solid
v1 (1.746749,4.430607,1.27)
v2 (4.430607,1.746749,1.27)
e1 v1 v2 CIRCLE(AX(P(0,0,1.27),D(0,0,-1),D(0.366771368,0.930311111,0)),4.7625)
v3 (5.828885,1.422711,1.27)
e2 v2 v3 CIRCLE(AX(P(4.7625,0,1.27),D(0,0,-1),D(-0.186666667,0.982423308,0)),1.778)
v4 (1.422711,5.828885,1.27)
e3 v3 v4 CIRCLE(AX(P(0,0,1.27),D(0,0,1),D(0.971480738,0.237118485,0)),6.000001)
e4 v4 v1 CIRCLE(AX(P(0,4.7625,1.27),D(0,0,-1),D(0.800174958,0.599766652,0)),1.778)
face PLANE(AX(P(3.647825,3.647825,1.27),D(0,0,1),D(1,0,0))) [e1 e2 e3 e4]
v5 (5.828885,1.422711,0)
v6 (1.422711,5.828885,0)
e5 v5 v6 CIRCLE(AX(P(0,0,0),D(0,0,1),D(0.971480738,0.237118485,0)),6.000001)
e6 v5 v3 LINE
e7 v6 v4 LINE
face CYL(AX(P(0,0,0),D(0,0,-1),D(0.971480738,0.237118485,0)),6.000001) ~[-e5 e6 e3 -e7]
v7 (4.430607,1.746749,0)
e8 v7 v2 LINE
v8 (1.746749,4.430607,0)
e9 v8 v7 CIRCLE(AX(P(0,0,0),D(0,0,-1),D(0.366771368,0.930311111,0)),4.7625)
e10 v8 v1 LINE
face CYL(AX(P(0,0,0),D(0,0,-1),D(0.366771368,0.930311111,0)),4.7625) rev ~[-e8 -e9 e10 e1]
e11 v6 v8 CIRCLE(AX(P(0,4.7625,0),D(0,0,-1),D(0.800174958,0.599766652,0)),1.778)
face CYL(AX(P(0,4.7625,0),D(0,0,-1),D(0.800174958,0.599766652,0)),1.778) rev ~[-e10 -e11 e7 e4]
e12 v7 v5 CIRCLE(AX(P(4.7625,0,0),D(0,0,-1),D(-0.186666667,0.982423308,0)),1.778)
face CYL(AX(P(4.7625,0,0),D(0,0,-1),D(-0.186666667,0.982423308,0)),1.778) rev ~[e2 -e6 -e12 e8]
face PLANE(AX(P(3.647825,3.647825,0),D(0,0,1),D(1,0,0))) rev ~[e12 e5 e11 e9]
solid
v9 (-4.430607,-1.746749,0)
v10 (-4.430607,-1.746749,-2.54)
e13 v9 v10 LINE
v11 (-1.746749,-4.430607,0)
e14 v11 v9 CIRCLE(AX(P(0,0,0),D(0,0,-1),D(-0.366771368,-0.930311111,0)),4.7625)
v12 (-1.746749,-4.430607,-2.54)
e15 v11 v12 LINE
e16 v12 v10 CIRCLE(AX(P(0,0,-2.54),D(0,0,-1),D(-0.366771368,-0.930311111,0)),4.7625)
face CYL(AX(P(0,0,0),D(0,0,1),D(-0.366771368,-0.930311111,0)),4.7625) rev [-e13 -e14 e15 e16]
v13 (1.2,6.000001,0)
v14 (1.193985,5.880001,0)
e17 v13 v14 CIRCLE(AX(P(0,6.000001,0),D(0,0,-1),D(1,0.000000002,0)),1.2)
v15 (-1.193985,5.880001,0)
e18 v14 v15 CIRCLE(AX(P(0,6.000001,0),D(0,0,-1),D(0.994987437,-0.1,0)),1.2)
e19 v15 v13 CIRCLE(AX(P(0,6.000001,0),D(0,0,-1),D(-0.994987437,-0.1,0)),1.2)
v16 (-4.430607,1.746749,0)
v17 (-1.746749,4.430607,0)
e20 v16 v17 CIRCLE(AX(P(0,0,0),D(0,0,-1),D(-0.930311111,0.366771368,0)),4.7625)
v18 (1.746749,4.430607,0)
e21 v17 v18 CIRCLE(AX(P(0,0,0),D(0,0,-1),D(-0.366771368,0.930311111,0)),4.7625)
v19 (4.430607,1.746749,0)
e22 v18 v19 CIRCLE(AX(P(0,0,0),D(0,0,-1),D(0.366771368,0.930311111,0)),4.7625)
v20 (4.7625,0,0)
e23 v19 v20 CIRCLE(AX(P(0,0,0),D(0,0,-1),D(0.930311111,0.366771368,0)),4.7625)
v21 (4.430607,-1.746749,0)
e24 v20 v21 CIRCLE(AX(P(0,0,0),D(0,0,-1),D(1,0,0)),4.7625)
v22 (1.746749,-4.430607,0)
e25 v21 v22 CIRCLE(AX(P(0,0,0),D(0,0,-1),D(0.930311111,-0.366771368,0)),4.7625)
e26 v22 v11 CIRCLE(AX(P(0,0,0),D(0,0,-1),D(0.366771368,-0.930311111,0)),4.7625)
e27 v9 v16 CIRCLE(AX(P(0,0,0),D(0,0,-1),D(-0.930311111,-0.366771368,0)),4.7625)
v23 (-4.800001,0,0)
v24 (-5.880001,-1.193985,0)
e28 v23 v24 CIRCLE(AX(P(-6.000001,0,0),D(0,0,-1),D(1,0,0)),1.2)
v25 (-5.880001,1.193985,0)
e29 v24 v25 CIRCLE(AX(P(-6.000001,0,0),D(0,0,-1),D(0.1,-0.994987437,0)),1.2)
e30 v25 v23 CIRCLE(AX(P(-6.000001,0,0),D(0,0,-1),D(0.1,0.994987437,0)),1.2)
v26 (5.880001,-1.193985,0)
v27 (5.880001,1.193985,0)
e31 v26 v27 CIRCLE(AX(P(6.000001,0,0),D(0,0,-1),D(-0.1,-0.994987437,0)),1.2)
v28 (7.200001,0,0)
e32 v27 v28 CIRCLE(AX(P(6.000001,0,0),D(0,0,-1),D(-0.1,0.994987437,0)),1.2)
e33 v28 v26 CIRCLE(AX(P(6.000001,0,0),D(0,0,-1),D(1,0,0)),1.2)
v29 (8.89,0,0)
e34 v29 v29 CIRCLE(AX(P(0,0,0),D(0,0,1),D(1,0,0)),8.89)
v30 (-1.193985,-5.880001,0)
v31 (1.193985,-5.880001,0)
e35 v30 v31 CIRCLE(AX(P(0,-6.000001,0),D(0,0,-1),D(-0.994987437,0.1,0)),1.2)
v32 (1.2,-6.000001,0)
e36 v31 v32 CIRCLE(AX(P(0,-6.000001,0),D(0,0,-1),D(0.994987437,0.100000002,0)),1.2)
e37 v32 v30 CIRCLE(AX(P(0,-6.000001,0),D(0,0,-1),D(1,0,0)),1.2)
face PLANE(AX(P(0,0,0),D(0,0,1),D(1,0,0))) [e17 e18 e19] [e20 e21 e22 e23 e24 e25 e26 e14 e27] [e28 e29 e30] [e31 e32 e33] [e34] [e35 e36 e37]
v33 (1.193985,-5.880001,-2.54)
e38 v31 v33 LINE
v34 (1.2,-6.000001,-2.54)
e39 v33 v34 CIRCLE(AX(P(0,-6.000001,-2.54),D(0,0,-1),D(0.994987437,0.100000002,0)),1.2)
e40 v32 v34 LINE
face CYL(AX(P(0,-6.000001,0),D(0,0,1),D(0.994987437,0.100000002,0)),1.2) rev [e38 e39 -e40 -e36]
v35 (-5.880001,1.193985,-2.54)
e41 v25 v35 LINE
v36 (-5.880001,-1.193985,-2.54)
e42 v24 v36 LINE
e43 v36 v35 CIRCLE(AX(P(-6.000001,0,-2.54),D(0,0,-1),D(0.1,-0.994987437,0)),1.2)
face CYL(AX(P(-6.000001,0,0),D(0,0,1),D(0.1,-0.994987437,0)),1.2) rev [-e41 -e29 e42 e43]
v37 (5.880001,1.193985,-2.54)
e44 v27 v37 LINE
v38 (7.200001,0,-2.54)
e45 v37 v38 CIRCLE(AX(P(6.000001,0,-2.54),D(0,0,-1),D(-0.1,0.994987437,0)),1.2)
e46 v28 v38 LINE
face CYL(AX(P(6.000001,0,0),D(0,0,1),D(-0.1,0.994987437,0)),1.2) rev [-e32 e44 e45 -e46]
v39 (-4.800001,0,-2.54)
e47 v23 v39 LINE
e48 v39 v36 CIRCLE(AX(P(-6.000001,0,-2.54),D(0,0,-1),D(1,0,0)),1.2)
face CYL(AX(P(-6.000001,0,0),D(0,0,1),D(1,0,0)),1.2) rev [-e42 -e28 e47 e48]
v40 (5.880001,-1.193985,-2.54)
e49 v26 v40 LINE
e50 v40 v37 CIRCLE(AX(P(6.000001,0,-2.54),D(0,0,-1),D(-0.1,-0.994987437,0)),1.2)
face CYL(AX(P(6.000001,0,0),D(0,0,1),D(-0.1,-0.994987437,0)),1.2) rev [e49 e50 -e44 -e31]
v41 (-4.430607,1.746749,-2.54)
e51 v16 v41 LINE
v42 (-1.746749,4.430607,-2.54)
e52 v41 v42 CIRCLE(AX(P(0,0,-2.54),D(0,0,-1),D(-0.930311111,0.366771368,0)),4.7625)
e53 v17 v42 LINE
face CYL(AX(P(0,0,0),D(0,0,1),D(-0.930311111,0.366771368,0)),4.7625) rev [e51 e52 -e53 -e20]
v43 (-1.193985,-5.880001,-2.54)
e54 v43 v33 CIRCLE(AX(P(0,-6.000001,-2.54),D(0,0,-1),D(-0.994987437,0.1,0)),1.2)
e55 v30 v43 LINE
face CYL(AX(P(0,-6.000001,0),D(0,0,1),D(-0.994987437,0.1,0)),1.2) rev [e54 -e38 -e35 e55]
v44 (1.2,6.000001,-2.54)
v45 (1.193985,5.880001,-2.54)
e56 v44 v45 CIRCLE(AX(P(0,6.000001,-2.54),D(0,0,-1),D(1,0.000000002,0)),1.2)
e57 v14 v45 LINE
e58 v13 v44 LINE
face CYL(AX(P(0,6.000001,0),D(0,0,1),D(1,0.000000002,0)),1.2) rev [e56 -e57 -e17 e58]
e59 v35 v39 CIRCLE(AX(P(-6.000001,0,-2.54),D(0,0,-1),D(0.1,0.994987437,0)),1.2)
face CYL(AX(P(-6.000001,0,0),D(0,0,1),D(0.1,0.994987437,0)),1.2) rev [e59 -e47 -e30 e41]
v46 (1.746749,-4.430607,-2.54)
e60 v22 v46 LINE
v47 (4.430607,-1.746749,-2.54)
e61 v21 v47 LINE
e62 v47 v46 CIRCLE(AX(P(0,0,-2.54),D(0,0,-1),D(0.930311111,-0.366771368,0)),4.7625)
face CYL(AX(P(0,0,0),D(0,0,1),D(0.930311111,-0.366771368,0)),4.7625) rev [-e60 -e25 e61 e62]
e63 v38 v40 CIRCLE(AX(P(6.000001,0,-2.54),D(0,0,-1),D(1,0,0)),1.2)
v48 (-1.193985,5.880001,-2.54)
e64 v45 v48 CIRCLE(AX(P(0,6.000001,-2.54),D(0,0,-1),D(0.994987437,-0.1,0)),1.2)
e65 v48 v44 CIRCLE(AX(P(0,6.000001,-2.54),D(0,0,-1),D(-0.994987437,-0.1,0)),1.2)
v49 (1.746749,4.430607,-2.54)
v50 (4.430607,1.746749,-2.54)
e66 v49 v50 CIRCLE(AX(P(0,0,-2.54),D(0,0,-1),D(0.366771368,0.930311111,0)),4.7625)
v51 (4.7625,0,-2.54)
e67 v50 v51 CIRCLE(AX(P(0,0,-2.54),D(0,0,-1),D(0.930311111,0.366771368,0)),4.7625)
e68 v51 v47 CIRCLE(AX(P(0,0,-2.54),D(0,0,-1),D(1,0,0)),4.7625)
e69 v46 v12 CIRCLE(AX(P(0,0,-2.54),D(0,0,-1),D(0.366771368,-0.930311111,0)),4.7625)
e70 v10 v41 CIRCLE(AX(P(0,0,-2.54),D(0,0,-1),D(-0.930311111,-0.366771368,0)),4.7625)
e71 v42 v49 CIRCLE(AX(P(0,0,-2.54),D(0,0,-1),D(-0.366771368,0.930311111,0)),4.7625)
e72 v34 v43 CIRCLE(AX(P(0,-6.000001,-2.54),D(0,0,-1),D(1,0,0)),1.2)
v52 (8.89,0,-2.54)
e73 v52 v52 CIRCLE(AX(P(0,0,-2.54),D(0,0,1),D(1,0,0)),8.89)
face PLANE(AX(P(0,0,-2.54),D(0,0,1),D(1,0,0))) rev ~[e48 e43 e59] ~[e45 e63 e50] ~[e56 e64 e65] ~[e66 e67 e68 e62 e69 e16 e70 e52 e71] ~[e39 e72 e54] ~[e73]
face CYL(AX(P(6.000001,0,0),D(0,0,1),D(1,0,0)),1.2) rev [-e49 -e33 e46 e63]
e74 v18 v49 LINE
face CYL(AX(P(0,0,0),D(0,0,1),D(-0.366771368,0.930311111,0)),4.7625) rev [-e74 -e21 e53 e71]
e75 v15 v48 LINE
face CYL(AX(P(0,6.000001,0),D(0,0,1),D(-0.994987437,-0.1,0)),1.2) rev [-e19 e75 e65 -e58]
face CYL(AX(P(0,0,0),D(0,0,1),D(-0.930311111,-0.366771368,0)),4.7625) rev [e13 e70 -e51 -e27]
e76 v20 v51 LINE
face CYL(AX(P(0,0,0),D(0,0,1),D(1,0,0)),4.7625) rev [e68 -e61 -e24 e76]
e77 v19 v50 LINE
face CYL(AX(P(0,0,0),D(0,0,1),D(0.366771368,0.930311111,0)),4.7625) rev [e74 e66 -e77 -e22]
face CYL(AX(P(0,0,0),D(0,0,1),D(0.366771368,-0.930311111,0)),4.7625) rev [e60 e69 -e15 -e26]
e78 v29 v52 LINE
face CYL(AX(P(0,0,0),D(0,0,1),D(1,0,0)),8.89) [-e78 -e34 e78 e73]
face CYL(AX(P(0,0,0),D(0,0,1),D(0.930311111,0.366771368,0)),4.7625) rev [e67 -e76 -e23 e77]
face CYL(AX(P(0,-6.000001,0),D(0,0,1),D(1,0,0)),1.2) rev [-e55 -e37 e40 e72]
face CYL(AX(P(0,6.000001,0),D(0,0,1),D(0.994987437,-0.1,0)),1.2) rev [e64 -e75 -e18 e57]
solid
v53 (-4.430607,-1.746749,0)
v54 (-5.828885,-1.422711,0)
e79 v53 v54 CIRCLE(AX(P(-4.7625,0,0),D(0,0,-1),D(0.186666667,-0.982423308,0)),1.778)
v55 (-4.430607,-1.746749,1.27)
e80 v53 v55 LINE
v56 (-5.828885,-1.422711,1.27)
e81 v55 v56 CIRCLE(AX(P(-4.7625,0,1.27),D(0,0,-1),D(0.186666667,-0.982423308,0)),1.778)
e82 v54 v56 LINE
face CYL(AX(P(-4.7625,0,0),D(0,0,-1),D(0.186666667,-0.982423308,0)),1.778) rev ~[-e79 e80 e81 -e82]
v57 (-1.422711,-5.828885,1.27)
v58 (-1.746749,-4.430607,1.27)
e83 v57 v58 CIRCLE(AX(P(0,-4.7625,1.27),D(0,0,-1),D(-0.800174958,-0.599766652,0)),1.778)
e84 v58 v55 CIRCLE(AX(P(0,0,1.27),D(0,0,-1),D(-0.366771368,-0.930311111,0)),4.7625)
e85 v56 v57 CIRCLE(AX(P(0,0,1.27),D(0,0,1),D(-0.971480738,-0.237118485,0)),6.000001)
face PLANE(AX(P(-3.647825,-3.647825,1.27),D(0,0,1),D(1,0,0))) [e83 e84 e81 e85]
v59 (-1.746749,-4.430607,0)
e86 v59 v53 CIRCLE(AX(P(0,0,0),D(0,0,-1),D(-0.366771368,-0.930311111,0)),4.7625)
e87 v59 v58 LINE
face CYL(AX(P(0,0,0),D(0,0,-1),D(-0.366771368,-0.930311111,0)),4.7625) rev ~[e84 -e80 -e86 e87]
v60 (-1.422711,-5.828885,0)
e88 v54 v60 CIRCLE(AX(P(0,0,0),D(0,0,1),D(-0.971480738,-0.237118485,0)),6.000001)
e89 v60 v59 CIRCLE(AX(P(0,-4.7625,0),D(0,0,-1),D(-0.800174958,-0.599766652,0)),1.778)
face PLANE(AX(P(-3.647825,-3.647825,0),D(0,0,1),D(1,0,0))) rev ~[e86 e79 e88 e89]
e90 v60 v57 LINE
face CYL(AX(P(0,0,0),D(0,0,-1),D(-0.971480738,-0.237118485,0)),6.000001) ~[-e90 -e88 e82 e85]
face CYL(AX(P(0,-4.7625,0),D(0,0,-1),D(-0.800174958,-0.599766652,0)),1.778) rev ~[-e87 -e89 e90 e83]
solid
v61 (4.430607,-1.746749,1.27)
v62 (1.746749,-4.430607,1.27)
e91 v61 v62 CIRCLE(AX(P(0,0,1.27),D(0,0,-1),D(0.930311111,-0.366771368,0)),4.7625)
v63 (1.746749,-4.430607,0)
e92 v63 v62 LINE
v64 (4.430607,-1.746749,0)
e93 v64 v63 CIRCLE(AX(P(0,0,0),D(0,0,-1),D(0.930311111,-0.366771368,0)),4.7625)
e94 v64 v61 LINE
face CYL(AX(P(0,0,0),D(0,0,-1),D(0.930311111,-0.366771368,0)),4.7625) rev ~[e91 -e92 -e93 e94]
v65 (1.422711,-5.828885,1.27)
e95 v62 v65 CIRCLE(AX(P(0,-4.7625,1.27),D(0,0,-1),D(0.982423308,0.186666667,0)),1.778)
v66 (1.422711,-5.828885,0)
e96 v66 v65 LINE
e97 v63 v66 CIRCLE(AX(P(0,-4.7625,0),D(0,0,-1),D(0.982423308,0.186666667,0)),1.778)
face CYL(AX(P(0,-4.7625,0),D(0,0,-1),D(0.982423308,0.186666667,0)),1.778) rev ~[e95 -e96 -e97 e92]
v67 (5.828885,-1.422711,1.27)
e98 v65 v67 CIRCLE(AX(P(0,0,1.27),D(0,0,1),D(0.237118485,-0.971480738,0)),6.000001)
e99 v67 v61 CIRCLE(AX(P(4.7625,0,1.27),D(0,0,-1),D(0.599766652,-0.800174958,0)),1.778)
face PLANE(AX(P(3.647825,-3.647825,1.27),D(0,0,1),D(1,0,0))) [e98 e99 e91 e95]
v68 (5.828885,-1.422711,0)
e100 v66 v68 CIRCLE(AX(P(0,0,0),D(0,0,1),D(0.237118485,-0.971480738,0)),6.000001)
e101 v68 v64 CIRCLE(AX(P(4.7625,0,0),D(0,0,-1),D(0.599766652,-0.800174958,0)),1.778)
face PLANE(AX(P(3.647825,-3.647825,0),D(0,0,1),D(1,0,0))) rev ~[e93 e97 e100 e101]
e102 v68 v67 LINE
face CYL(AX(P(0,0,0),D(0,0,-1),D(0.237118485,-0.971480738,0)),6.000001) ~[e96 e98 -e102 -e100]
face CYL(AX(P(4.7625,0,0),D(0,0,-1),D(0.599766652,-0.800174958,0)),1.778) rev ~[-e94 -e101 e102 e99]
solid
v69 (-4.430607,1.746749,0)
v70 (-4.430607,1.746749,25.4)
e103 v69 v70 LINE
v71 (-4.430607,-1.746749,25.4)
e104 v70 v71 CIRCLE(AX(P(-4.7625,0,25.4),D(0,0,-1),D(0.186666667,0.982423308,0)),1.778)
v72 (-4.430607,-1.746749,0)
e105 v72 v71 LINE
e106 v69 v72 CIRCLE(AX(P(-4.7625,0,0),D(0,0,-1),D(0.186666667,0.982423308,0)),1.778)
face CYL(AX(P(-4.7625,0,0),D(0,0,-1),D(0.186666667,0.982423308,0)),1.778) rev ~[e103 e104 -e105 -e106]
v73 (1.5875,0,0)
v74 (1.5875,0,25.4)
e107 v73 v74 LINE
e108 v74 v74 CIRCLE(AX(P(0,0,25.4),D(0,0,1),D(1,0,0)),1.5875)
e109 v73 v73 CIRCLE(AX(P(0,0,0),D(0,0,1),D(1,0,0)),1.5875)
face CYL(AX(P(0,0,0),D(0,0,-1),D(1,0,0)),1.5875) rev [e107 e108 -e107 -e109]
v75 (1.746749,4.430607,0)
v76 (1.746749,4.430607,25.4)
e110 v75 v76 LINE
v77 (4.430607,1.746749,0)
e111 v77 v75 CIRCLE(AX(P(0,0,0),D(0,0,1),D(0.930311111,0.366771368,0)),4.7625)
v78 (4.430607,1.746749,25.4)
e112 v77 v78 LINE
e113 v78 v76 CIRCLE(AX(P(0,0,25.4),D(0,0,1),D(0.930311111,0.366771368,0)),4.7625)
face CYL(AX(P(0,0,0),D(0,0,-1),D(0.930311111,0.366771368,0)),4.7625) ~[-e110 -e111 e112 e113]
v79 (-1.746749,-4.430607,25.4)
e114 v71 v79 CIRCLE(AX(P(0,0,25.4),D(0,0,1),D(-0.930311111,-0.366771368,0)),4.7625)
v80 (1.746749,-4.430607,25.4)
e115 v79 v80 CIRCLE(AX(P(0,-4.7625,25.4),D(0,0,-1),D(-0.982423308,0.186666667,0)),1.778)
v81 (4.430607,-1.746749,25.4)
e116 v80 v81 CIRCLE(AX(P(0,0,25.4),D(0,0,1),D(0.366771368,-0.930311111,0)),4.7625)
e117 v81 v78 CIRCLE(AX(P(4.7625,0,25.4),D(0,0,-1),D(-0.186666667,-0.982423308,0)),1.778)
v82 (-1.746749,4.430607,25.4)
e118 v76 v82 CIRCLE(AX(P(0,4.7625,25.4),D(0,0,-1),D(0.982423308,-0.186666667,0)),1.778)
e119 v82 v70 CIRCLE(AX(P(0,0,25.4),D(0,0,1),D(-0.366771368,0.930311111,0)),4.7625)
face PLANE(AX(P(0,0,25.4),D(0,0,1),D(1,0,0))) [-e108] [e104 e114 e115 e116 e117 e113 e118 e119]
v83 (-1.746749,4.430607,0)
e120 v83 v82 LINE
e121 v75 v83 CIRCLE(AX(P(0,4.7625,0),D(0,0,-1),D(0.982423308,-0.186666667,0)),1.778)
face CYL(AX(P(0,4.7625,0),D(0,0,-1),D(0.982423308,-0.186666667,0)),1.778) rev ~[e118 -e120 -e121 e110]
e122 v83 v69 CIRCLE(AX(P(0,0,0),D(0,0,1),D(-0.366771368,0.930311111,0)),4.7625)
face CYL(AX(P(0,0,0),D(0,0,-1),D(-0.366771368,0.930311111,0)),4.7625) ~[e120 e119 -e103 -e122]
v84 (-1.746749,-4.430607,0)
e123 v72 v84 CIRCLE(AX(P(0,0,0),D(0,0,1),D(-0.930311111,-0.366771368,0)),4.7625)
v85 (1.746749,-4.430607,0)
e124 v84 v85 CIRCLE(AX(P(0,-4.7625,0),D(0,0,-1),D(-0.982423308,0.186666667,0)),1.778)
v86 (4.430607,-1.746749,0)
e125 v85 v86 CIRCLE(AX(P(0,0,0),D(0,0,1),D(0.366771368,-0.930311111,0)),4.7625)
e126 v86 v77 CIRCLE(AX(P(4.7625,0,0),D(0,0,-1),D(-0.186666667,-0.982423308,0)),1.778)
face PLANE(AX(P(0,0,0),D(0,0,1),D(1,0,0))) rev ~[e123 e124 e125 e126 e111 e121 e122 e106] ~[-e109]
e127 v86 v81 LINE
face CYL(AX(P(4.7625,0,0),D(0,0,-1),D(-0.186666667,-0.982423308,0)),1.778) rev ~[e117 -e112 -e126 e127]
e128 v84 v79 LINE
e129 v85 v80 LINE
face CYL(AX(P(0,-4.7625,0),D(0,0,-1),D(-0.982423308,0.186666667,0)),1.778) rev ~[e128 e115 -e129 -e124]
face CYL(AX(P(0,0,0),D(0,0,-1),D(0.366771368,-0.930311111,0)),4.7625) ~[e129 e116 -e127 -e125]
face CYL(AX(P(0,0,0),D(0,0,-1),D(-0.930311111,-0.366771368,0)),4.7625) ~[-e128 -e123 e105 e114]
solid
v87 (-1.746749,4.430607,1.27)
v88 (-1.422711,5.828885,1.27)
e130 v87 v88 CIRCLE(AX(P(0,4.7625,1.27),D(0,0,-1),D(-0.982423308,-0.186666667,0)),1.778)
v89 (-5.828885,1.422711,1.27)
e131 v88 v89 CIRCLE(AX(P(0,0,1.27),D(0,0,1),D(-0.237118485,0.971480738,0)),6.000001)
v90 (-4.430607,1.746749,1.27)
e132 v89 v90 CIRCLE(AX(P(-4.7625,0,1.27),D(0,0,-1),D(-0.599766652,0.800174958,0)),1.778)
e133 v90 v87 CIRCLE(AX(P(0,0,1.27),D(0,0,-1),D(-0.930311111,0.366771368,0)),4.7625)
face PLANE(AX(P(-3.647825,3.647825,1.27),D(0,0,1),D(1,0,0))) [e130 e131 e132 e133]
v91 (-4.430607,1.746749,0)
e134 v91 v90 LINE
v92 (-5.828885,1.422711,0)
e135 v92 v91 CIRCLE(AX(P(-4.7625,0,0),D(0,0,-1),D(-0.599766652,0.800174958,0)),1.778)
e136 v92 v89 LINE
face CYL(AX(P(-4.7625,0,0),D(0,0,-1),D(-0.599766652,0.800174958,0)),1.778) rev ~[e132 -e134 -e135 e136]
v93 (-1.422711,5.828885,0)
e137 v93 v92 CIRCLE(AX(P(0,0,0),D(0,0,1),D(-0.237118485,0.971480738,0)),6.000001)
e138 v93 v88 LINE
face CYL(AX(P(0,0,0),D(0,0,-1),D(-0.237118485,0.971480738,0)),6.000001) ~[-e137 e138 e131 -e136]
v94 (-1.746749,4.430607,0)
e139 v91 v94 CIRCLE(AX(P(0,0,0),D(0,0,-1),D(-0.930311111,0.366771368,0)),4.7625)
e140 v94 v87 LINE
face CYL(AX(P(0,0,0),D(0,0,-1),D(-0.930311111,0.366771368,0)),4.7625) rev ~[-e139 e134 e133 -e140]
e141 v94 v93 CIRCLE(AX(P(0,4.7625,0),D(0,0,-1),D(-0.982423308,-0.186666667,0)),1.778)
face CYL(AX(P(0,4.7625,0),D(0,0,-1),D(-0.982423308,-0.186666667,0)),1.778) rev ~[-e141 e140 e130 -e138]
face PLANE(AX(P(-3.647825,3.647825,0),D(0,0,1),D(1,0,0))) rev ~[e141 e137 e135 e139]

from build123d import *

# Parameters (mm, degrees)
F0_R     = 8.89
F1_DEPTH = 2.54
F0_R_2   = 1.5875
F2_DEPTH = 25.4
F3_DEPTH = 1.27


# Not quite as in the source:
# - a feature names something its author has since deleted; it is built from what else it names


with BuildPart() as f1:
    # F0 (on Top) → F1 (new body)
    with BuildSketch(Plane.XY):
        Circle(F0_R)
        with BuildLine():
            ThreePointArc((1.4227110748, 5.8288851076), (4.2426411821, 4.2426411821), (5.8288851076, 1.4227110748))
            ThreePointArc((5.8288851076, 1.4227110748), (5.8555597964, 1.3085976735), (5.880000686, 1.1939850638))
            ThreePointArc((5.880000686, 1.1939850638), (6.8049852658, 0.8899439223), (7.20000084, 0))
            ThreePointArc((7.20000084, 0), (6.8049852658, -0.8899439223), (5.880000686, -1.1939850638))
            ThreePointArc((5.880000686, -1.1939850638), (5.8555597964, -1.3085976735), (5.8288851076, -1.4227110748))
            ThreePointArc((5.8288851076, -1.4227110748), (4.2426411821, -4.2426411821), (1.4227110748, -5.8288851076))
            ThreePointArc((1.4227110748, -5.8288851076), (1.3085976735, -5.8555597964), (1.1939850638, -5.880000686))
            ThreePointArc((1.1939850638, -5.880000686), (1.1984954276, -5.9399253629), (1.20000014, -6.0000007))
            ThreePointArc((1.20000014, -6.0000007), (-0.0600753371, -7.1984961276), (-1.1939850638, -5.880000686))
            ThreePointArc((-1.1939850638, -5.880000686), (-1.3085976735, -5.8555597964), (-1.4227110748, -5.8288851076))
            ThreePointArc((-1.4227110748, -5.8288851076), (-4.2426411821, -4.2426411821), (-5.8288851076, -1.4227110748))
            ThreePointArc((-5.8288851076, -1.4227110748), (-5.8555597964, -1.3085976735), (-5.880000686, -1.1939850638))
            ThreePointArc((-5.880000686, -1.1939850638), (-7.20000084, 0), (-5.880000686, 1.1939850638))
            ThreePointArc((-5.880000686, 1.1939850638), (-5.8555597964, 1.3085976735), (-5.8288851076, 1.4227110748))
            ThreePointArc((-5.8288851076, 1.4227110748), (-4.2426411821, 4.2426411821), (-1.4227110748, 5.8288851076))
            ThreePointArc((-1.4227110748, 5.8288851076), (-1.3085976735, 5.8555597964), (-1.1939850638, 5.880000686))
            ThreePointArc((-1.1939850638, 5.880000686), (-0.0600753371, 7.1984961276), (1.20000014, 6.0000007))
            ThreePointArc((1.20000014, 6.0000007), (1.1984954276, 5.9399253629), (1.1939850638, 5.880000686))
            ThreePointArc((1.1939850638, 5.880000686), (1.3085976735, 5.8555597964), (1.4227110748, 5.8288851076))
        make_face(mode=Mode.SUBTRACT)
        with BuildLine():
            ThreePointArc((-4.4306066667, 1.7467486411), (-3.3675960454, 3.3675960454), (-1.7467486411, 4.4306066667))
            ThreePointArc((-1.7467486411, 4.4306066667), (-1.7320982571, 5.1638970948), (-1.4227110748, 5.8288851076))
            ThreePointArc((-1.4227110748, 5.8288851076), (-4.2426411821, 4.2426411821), (-5.8288851076, 1.4227110748))
            ThreePointArc((-5.8288851076, 1.4227110748), (-5.1638970948, 1.7320982571), (-4.4306066667, 1.7467486411))
        make_face()
        with BuildLine():
            ThreePointArc((1.7467486411, 4.4306066667), (3.3675960454, 3.3675960454), (4.4306066667, 1.7467486411))
            ThreePointArc((4.4306066667, 1.7467486411), (5.1638970948, 1.7320982571), (5.8288851076, 1.4227110748))
            ThreePointArc((5.8288851076, 1.4227110748), (4.2426411821, 4.2426411821), (1.4227110748, 5.8288851076))
            ThreePointArc((1.4227110748, 5.8288851076), (1.7320982571, 5.1638970948), (1.7467486411, 4.4306066667))
        make_face()
        with BuildLine():
            ThreePointArc((5.8288851076, -1.4227110748), (5.1638970948, -1.7320982571), (4.4306066667, -1.7467486411))
            ThreePointArc((4.4306066667, -1.7467486411), (3.3675960454, -3.3675960454), (1.7467486411, -4.4306066667))
            ThreePointArc((1.7467486411, -4.4306066667), (1.7320982571, -5.1638970948), (1.4227110748, -5.8288851076))
            ThreePointArc((1.4227110748, -5.8288851076), (4.2426411821, -4.2426411821), (5.8288851076, -1.4227110748))
        make_face()
        with BuildLine():
            ThreePointArc((-1.4227110748, -5.8288851076), (-1.7320982571, -5.1638970948), (-1.7467486411, -4.4306066667))
            ThreePointArc((-1.7467486411, -4.4306066667), (-3.3675960454, -3.3675960454), (-4.4306066667, -1.7467486411))
            ThreePointArc((-4.4306066667, -1.7467486411), (-5.1638970948, -1.7320982571), (-5.8288851076, -1.4227110748))
            ThreePointArc((-5.8288851076, -1.4227110748), (-4.2426411821, -4.2426411821), (-1.4227110748, -5.8288851076))
        make_face()
        with BuildLine():
            ThreePointArc((-1.7467486411, 4.4306066667), (0, 4.7625), (1.7467486411, 4.4306066667))
            ThreePointArc((1.7467486411, 4.4306066667), (1.7320982571, 5.1638970948), (1.4227110748, 5.8288851076))
            ThreePointArc((1.4227110748, 5.8288851076), (1.3085976735, 5.8555597964), (1.1939850638, 5.880000686))
            ThreePointArc((1.1939850638, 5.880000686), (0, 4.80000056), (-1.1939850638, 5.880000686))
            ThreePointArc((-1.1939850638, 5.880000686), (-1.3085976735, 5.8555597964), (-1.4227110748, 5.8288851076))
            ThreePointArc((-1.4227110748, 5.8288851076), (-1.7320982571, 5.1638970948), (-1.7467486411, 4.4306066667))
        make_face()
        with BuildLine():
            ThreePointArc((4.4306066667, 1.7467486411), (4.678791003, 0.889), (4.7625, 0))
            ThreePointArc((4.7625, 0), (4.678791003, -0.889), (4.4306066667, -1.7467486411))
            ThreePointArc((4.4306066667, -1.7467486411), (5.1638970948, -1.7320982571), (5.8288851076, -1.4227110748))
            ThreePointArc((5.8288851076, -1.4227110748), (5.8555597964, -1.3085976735), (5.880000686, -1.1939850638))
            ThreePointArc((5.880000686, -1.1939850638), (4.80000056, 0), (5.880000686, 1.1939850638))
            ThreePointArc((5.880000686, 1.1939850638), (5.8555597964, 1.3085976735), (5.8288851076, 1.4227110748))
            ThreePointArc((5.8288851076, 1.4227110748), (5.1638970948, 1.7320982571), (4.4306066667, 1.7467486411))
        make_face()
        with BuildLine():
            ThreePointArc((1.4227110748, -5.8288851076), (1.7320982571, -5.1638970948), (1.7467486411, -4.4306066667))
            ThreePointArc((1.7467486411, -4.4306066667), (0, -4.7625), (-1.7467486411, -4.4306066667))
            ThreePointArc((-1.7467486411, -4.4306066667), (-1.7320982571, -5.1638970948), (-1.4227110748, -5.8288851076))
            ThreePointArc((-1.4227110748, -5.8288851076), (-1.3085976735, -5.8555597964), (-1.1939850638, -5.880000686))
            ThreePointArc((-1.1939850638, -5.880000686), (0, -4.80000056), (1.1939850638, -5.880000686))
            ThreePointArc((1.1939850638, -5.880000686), (1.3085976735, -5.8555597964), (1.4227110748, -5.8288851076))
        make_face()
        with BuildLine():
            ThreePointArc((-4.4306066667, -1.7467486411), (-4.7625, 0), (-4.4306066667, 1.7467486411))
            ThreePointArc((-4.4306066667, 1.7467486411), (-5.1638970948, 1.7320982571), (-5.8288851076, 1.4227110748))
            ThreePointArc((-5.8288851076, 1.4227110748), (-5.8555597964, 1.3085976735), (-5.880000686, 1.1939850638))
            ThreePointArc((-5.880000686, 1.1939850638), (-5.1100567777, 0.8049845658), (-4.80000056, 0))
            ThreePointArc((-4.80000056, 0), (-5.1100567777, -0.8049845658), (-5.880000686, -1.1939850638))
            ThreePointArc((-5.880000686, -1.1939850638), (-5.8555597964, -1.3085976735), (-5.8288851076, -1.4227110748))
            ThreePointArc((-5.8288851076, -1.4227110748), (-5.1638970948, -1.7320982571), (-4.4306066667, -1.7467486411))
        make_face()
    extrude(amount=-F1_DEPTH)


with BuildPart() as f2:
    # F0 (on Top) → F2 (new body)
    with BuildSketch(Plane.XY):
        with BuildLine():
            ThreePointArc((4.4306066667, -1.7467486411), (2.9845, 0), (4.4306066667, 1.7467486411))
            ThreePointArc((4.4306066667, 1.7467486411), (3.3675960454, 3.3675960454), (1.7467486411, 4.4306066667))
            ThreePointArc((1.7467486411, 4.4306066667), (0, 2.9845), (-1.7467486411, 4.4306066667))
            ThreePointArc((-1.7467486411, 4.4306066667), (-3.3675960454, 3.3675960454), (-4.4306066667, 1.7467486411))
            ThreePointArc((-4.4306066667, 1.7467486411), (-2.9845, 0), (-4.4306066667, -1.7467486411))
            ThreePointArc((-4.4306066667, -1.7467486411), (-3.3675960454, -3.3675960454), (-1.7467486411, -4.4306066667))
            ThreePointArc((-1.7467486411, -4.4306066667), (0, -2.9845), (1.7467486411, -4.4306066667))
            ThreePointArc((1.7467486411, -4.4306066667), (3.3675960454, -3.3675960454), (4.4306066667, -1.7467486411))
        make_face()
        Circle(F0_R_2, mode=Mode.SUBTRACT)
    extrude(amount=F2_DEPTH)


with BuildPart() as f3:
    # F0 (on Top) → F3 (new body)
    with BuildSketch(Plane.XY):
        with BuildLine():
            ThreePointArc((-1.4227110748, -5.8288851076), (-1.7320982571, -5.1638970948), (-1.7467486411, -4.4306066667))
            ThreePointArc((-1.7467486411, -4.4306066667), (-3.3675960454, -3.3675960454), (-4.4306066667, -1.7467486411))
            ThreePointArc((-4.4306066667, -1.7467486411), (-5.1638970948, -1.7320982571), (-5.8288851076, -1.4227110748))
            ThreePointArc((-5.8288851076, -1.4227110748), (-4.2426411821, -4.2426411821), (-1.4227110748, -5.8288851076))
        make_face()
    extrude(amount=F3_DEPTH)


with BuildPart() as f3b:
    # F0 (on Top) → F3, piece 2 (new body)
    with BuildSketch(Plane.XY):
        with BuildLine():
            ThreePointArc((5.8288851076, -1.4227110748), (5.1638970948, -1.7320982571), (4.4306066667, -1.7467486411))
            ThreePointArc((4.4306066667, -1.7467486411), (3.3675960454, -3.3675960454), (1.7467486411, -4.4306066667))
            ThreePointArc((1.7467486411, -4.4306066667), (1.7320982571, -5.1638970948), (1.4227110748, -5.8288851076))
            ThreePointArc((1.4227110748, -5.8288851076), (4.2426411821, -4.2426411821), (5.8288851076, -1.4227110748))
        make_face()
    extrude(amount=F3_DEPTH)


with BuildPart() as f3c:
    # F0 (on Top) → F3, piece 3 (new body)
    with BuildSketch(Plane.XY):
        with BuildLine():
            ThreePointArc((1.7467486411, 4.4306066667), (3.3675960454, 3.3675960454), (4.4306066667, 1.7467486411))
            ThreePointArc((4.4306066667, 1.7467486411), (5.1638970948, 1.7320982571), (5.8288851076, 1.4227110748))
            ThreePointArc((5.8288851076, 1.4227110748), (4.2426411821, 4.2426411821), (1.4227110748, 5.8288851076))
            ThreePointArc((1.4227110748, 5.8288851076), (1.7320982571, 5.1638970948), (1.7467486411, 4.4306066667))
        make_face()
    extrude(amount=F3_DEPTH)


with BuildPart() as f3d:
    # F0 (on Top) → F3, piece 4 (new body)
    with BuildSketch(Plane.XY):
        with BuildLine():
            ThreePointArc((-4.4306066667, 1.7467486411), (-3.3675960454, 3.3675960454), (-1.7467486411, 4.4306066667))
            ThreePointArc((-1.7467486411, 4.4306066667), (-1.7320982571, 5.1638970948), (-1.4227110748, 5.8288851076))
            ThreePointArc((-1.4227110748, 5.8288851076), (-4.2426411821, 4.2426411821), (-5.8288851076, 1.4227110748))
            ThreePointArc((-5.8288851076, 1.4227110748), (-5.1638970948, 1.7320982571), (-4.4306066667, 1.7467486411))
        make_face()
    extrude(amount=F3_DEPTH)


solid = Compound([f1.part, f2.part, f3.part, f3b.part, f3c.part, f3d.part])
